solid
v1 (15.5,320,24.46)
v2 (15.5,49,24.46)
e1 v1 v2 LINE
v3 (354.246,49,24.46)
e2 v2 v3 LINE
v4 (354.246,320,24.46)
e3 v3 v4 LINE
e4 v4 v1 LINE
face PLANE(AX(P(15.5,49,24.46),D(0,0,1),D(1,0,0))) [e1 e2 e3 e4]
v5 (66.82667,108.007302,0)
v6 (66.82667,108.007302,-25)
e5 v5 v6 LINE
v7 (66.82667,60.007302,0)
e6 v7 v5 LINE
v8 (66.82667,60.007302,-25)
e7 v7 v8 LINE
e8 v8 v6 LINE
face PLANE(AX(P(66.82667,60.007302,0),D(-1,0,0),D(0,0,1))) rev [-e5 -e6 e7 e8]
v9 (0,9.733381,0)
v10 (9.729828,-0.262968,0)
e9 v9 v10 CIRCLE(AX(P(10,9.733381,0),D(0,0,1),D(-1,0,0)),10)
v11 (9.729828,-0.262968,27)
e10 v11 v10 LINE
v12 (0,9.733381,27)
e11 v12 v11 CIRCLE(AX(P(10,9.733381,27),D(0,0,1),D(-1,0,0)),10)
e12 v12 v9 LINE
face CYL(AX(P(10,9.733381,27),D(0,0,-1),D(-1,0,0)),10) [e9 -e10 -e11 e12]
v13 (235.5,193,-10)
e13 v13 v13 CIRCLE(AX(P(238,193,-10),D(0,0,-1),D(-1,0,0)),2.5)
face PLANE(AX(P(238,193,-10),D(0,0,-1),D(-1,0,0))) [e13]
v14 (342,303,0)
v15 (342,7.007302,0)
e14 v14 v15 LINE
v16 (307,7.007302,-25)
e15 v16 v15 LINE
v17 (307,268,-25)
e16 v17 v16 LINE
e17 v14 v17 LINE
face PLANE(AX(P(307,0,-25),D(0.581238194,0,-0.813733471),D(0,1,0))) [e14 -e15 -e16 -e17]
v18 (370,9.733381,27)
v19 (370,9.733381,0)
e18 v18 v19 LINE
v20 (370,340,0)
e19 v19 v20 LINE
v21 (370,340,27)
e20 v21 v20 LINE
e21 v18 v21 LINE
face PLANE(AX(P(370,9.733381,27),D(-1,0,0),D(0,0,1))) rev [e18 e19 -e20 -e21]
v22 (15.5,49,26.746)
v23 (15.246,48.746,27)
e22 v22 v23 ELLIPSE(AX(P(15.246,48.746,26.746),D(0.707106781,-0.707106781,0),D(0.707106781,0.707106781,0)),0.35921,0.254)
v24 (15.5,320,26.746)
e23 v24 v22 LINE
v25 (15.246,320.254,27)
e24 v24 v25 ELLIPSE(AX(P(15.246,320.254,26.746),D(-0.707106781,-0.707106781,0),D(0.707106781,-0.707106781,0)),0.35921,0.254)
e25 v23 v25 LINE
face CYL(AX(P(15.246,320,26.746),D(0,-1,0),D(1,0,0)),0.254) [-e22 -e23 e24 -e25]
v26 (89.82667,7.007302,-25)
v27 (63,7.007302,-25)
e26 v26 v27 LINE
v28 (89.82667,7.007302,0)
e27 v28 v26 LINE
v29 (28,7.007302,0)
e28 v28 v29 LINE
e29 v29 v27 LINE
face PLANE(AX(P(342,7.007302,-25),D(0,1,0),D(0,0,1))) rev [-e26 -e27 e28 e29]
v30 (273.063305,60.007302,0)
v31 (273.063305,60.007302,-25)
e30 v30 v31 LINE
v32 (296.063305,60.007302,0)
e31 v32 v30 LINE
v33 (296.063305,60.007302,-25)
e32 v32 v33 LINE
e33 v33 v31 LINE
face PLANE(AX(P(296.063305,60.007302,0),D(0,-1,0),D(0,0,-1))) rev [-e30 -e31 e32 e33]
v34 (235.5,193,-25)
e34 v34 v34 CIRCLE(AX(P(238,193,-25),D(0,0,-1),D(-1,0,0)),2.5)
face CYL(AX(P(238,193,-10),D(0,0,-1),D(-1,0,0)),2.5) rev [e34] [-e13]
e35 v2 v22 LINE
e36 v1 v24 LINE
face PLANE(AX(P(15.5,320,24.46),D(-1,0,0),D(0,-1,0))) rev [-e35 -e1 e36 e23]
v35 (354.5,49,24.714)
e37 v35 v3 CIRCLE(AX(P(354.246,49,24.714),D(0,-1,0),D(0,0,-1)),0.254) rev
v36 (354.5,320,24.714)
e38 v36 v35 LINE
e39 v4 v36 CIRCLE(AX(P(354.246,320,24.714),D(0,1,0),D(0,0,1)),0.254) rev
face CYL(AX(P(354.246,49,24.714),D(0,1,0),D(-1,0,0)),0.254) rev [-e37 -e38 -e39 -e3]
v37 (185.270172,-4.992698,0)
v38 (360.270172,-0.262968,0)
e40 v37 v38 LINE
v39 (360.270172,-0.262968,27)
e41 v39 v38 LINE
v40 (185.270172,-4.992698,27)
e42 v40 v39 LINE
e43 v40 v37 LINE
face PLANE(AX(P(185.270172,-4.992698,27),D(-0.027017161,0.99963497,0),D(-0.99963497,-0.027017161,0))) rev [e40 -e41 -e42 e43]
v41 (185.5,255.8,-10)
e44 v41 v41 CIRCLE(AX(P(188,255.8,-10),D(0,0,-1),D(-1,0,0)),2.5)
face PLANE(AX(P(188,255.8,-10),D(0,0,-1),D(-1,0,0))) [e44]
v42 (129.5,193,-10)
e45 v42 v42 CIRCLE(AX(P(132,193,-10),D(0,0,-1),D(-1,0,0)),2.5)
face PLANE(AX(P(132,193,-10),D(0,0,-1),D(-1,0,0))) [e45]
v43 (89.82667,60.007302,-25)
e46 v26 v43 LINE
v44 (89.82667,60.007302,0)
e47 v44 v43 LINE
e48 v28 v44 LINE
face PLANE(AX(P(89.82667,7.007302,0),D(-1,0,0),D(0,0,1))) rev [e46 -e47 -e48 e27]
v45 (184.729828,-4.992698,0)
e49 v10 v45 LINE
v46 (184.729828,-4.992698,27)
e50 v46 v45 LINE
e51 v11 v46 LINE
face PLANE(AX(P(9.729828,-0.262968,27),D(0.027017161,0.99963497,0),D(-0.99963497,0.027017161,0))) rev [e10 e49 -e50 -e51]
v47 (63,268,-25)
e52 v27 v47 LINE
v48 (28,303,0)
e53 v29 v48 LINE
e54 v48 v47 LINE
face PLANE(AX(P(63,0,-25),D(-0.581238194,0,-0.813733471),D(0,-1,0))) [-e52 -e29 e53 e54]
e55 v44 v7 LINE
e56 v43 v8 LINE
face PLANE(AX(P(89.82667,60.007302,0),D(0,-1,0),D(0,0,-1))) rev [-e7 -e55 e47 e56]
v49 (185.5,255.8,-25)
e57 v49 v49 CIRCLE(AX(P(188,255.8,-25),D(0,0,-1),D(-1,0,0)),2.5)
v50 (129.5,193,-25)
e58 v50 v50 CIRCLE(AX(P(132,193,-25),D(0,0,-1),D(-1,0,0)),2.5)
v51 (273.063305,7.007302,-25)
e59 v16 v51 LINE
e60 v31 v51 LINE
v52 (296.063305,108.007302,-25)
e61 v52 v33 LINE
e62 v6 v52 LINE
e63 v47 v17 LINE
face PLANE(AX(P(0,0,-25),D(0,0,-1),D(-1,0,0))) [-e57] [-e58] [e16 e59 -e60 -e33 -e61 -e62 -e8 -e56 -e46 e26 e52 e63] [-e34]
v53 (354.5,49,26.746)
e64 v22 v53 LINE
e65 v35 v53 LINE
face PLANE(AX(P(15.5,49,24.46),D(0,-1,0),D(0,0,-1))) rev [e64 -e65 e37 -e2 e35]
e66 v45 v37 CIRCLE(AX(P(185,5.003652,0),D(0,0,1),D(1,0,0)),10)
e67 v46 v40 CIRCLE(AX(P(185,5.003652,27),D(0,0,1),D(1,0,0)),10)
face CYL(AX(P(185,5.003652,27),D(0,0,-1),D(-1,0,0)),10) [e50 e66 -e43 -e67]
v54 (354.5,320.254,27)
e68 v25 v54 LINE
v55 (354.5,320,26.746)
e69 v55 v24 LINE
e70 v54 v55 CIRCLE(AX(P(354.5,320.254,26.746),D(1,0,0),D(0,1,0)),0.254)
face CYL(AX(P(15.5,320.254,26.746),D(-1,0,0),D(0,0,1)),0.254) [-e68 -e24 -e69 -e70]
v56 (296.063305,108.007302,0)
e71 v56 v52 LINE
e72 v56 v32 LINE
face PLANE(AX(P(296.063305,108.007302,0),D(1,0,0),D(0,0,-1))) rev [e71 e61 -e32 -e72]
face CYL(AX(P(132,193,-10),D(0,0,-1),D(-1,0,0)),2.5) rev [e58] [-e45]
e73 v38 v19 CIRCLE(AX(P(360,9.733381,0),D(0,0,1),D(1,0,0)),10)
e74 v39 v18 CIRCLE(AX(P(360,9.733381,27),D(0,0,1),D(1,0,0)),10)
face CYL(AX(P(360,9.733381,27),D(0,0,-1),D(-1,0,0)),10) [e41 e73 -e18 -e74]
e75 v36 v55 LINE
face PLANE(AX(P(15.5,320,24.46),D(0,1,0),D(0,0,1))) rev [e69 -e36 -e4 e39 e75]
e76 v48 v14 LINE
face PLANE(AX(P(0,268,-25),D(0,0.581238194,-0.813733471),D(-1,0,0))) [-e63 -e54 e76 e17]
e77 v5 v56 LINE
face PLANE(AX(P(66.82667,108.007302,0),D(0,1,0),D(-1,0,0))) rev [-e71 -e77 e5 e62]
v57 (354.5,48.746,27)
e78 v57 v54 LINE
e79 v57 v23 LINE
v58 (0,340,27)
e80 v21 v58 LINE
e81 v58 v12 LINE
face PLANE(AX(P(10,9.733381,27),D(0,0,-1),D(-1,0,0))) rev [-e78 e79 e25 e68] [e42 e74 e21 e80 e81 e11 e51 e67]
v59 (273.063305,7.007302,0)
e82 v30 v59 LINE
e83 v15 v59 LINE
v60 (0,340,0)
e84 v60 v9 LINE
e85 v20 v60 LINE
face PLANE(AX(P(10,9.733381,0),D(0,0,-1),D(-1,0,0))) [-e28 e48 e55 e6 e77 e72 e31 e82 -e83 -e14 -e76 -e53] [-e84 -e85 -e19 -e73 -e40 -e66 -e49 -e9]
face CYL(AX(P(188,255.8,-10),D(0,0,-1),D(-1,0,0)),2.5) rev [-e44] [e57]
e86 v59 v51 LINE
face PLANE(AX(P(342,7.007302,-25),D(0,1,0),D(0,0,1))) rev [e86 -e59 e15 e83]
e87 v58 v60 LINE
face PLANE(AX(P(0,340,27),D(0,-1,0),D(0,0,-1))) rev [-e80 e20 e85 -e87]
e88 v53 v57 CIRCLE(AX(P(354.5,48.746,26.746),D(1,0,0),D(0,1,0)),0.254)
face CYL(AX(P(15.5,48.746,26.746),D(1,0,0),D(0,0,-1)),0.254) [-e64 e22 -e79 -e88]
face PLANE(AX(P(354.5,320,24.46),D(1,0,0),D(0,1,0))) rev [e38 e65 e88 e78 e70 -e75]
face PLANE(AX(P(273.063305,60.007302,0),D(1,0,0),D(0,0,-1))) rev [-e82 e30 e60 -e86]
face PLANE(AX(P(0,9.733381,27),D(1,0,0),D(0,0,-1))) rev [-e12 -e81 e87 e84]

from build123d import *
from OCP.BRepFilletAPI import BRepFilletAPI_MakeChamfer

# Parameters (mm, degrees)
BOSS_EXTRUDE1_DEPTH     = 27
SKETCH2_W               = 339
SKETCH2_H               = 271
CUT_EXTRUDE1_DEPTH      = 2.54
FILLET2_R               = 0.254
ESQUISSE1_W             = 314
ESQUISSE1_H             = 295.992698065
BOSS_EXTRU_1_DEPTH      = 25
CHANFREIN1_SIZE         = 25
CHANFREIN1_SIZE_2       = 35
ENL_V_MAT_EXTRU_1_DEPTH = 25
ESQUISSE3_R             = 2.5
ENL_V_MAT_EXTRU_2_DEPTH = 15


with BuildPart() as part:
    # Sketch1 → Boss-Extrude1 (new body)
    with BuildSketch(Plane.XY):
        with BuildLine():
            Line((9.729828387, -0.262968335), (184.729828387, -4.992698065))
            ThreePointArc((184.729828387, -4.992698065), (185, -4.996348366), (185.270171613, -4.992698065))
            Line((185.270171613, -4.992698065), (360.270171613, -0.262968335))
            ThreePointArc((360.270171613, -0.262968335), (367.165951302, 2.758487678), (370, 9.733381364))
            Line((370, 9.733381364), (370, 340))
            Line((370, 340), (0, 340))
            Line((0, 340), (0, 9.733381364))
            ThreePointArc((0, 9.733381364), (2.834048698, 2.758487678), (9.729828387, -0.262968335))
        make_face()
    extrude(amount=BOSS_EXTRUDE1_DEPTH)

    # Sketch2 → Cut-Extrude1 (cut)
    with BuildSketch(Plane.XY.offset(27)):
        with Locations((185, 184.5)):
            Rectangle(SKETCH2_W, SKETCH2_H)
    extrude(amount=-CUT_EXTRUDE1_DEPTH, mode=Mode.SUBTRACT)

    # Fillet2
    fillet2_edges = [part.edges().sort_by_distance(p)[0] for p in [
        (354.5, 184.5, 24.46),
        (15.5, 184.5, 27),
        (185, 49, 27),
        (185, 320, 27),
    ]]
    fillet(fillet2_edges, radius=FILLET2_R)

    # Esquisse1 → Boss.-Extru.1 (add)
    with BuildSketch(Plane(origin=(0, 0, 0), x_dir=(-1, 0, 0), z_dir=(0, 0, -1))):
        with Locations((-185, 155.003650967)):
            Rectangle(ESQUISSE1_W, ESQUISSE1_H)
    extrude(amount=BOSS_EXTRU_1_DEPTH)

    # Chanfrein1
    chanfrein1_edges_1 = [part.edges().sort_by_distance(p)[0] for p in [
        (28, 155.003650968, -25),
    ]]
    chanfrein1_side_1 = [part.faces().sort_by_distance(p)[0] for p in [
        (28, 155.003650968, -24.5),
    ]]
    chanfrein1_edges_2 = [part.edges().sort_by_distance(p)[0] for p in [
        (185, 303, -25),
    ]]
    chanfrein1_side_2 = [part.faces().sort_by_distance(p)[0] for p in [
        (185, 303, -24.5),
    ]]
    chanfrein1_edges_3 = [part.edges().sort_by_distance(p)[0] for p in [
        (342, 155.003650968, -25),
    ]]
    chanfrein1_side_3 = [part.faces().sort_by_distance(p)[0] for p in [
        (342, 155.003650968, -24.5),
    ]]
    chanfrein1 = BRepFilletAPI_MakeChamfer(part.part.solid().wrapped)
    for e in chanfrein1_edges_1:
        chanfrein1.Add(CHANFREIN1_SIZE - 0.0001, CHANFREIN1_SIZE_2 - 0.0001, e.wrapped, chanfrein1_side_1[0].wrapped)
    for e in chanfrein1_edges_2:
        chanfrein1.Add(CHANFREIN1_SIZE - 0.0001, CHANFREIN1_SIZE_2 - 0.0001, e.wrapped, chanfrein1_side_2[0].wrapped)
    for e in chanfrein1_edges_3:
        chanfrein1.Add(CHANFREIN1_SIZE - 0.0001, CHANFREIN1_SIZE_2 - 0.0001, e.wrapped, chanfrein1_side_3[0].wrapped)
    add(Compound.cast(chanfrein1.Shape()), mode=Mode.REPLACE)  # a hair under: the kernel refuses the full size

    # Esquisse2 → Enlèv. mat.-Extru.1 (cut)
    with BuildSketch(Plane(origin=(0, 0, -25), x_dir=(-1, 0, 0), z_dir=(0, 0, -1))):
        Polygon((-273.063305356, 7.007301935), (-89.826670404, 7.007301935), (-89.826670404, 60.007301935), (-66.826670404, 60.007301935), (-66.826670404, 108.007301935), (-296.063305356, 108.007301935), (-296.063305356, 60.007301935), (-273.063305356, 60.007301935), align=None)
    extrude(amount=-ENL_V_MAT_EXTRU_1_DEPTH, mode=Mode.SUBTRACT)

    # Esquisse3 → Enlèv. mat.-Extru.2 (cut)
    with BuildSketch(Plane(origin=(0, 0, -25), x_dir=(-1, 0, 0), z_dir=(0, 0, -1))):
        with Locations((-188, 255.8)):
            Circle(ESQUISSE3_R)
        with Locations((-238, 193)):
            Circle(ESQUISSE3_R)
        with Locations((-132, 193)):
            Circle(ESQUISSE3_R)
    extrude(amount=-ENL_V_MAT_EXTRU_2_DEPTH, mode=Mode.SUBTRACT)


solid = part.part
